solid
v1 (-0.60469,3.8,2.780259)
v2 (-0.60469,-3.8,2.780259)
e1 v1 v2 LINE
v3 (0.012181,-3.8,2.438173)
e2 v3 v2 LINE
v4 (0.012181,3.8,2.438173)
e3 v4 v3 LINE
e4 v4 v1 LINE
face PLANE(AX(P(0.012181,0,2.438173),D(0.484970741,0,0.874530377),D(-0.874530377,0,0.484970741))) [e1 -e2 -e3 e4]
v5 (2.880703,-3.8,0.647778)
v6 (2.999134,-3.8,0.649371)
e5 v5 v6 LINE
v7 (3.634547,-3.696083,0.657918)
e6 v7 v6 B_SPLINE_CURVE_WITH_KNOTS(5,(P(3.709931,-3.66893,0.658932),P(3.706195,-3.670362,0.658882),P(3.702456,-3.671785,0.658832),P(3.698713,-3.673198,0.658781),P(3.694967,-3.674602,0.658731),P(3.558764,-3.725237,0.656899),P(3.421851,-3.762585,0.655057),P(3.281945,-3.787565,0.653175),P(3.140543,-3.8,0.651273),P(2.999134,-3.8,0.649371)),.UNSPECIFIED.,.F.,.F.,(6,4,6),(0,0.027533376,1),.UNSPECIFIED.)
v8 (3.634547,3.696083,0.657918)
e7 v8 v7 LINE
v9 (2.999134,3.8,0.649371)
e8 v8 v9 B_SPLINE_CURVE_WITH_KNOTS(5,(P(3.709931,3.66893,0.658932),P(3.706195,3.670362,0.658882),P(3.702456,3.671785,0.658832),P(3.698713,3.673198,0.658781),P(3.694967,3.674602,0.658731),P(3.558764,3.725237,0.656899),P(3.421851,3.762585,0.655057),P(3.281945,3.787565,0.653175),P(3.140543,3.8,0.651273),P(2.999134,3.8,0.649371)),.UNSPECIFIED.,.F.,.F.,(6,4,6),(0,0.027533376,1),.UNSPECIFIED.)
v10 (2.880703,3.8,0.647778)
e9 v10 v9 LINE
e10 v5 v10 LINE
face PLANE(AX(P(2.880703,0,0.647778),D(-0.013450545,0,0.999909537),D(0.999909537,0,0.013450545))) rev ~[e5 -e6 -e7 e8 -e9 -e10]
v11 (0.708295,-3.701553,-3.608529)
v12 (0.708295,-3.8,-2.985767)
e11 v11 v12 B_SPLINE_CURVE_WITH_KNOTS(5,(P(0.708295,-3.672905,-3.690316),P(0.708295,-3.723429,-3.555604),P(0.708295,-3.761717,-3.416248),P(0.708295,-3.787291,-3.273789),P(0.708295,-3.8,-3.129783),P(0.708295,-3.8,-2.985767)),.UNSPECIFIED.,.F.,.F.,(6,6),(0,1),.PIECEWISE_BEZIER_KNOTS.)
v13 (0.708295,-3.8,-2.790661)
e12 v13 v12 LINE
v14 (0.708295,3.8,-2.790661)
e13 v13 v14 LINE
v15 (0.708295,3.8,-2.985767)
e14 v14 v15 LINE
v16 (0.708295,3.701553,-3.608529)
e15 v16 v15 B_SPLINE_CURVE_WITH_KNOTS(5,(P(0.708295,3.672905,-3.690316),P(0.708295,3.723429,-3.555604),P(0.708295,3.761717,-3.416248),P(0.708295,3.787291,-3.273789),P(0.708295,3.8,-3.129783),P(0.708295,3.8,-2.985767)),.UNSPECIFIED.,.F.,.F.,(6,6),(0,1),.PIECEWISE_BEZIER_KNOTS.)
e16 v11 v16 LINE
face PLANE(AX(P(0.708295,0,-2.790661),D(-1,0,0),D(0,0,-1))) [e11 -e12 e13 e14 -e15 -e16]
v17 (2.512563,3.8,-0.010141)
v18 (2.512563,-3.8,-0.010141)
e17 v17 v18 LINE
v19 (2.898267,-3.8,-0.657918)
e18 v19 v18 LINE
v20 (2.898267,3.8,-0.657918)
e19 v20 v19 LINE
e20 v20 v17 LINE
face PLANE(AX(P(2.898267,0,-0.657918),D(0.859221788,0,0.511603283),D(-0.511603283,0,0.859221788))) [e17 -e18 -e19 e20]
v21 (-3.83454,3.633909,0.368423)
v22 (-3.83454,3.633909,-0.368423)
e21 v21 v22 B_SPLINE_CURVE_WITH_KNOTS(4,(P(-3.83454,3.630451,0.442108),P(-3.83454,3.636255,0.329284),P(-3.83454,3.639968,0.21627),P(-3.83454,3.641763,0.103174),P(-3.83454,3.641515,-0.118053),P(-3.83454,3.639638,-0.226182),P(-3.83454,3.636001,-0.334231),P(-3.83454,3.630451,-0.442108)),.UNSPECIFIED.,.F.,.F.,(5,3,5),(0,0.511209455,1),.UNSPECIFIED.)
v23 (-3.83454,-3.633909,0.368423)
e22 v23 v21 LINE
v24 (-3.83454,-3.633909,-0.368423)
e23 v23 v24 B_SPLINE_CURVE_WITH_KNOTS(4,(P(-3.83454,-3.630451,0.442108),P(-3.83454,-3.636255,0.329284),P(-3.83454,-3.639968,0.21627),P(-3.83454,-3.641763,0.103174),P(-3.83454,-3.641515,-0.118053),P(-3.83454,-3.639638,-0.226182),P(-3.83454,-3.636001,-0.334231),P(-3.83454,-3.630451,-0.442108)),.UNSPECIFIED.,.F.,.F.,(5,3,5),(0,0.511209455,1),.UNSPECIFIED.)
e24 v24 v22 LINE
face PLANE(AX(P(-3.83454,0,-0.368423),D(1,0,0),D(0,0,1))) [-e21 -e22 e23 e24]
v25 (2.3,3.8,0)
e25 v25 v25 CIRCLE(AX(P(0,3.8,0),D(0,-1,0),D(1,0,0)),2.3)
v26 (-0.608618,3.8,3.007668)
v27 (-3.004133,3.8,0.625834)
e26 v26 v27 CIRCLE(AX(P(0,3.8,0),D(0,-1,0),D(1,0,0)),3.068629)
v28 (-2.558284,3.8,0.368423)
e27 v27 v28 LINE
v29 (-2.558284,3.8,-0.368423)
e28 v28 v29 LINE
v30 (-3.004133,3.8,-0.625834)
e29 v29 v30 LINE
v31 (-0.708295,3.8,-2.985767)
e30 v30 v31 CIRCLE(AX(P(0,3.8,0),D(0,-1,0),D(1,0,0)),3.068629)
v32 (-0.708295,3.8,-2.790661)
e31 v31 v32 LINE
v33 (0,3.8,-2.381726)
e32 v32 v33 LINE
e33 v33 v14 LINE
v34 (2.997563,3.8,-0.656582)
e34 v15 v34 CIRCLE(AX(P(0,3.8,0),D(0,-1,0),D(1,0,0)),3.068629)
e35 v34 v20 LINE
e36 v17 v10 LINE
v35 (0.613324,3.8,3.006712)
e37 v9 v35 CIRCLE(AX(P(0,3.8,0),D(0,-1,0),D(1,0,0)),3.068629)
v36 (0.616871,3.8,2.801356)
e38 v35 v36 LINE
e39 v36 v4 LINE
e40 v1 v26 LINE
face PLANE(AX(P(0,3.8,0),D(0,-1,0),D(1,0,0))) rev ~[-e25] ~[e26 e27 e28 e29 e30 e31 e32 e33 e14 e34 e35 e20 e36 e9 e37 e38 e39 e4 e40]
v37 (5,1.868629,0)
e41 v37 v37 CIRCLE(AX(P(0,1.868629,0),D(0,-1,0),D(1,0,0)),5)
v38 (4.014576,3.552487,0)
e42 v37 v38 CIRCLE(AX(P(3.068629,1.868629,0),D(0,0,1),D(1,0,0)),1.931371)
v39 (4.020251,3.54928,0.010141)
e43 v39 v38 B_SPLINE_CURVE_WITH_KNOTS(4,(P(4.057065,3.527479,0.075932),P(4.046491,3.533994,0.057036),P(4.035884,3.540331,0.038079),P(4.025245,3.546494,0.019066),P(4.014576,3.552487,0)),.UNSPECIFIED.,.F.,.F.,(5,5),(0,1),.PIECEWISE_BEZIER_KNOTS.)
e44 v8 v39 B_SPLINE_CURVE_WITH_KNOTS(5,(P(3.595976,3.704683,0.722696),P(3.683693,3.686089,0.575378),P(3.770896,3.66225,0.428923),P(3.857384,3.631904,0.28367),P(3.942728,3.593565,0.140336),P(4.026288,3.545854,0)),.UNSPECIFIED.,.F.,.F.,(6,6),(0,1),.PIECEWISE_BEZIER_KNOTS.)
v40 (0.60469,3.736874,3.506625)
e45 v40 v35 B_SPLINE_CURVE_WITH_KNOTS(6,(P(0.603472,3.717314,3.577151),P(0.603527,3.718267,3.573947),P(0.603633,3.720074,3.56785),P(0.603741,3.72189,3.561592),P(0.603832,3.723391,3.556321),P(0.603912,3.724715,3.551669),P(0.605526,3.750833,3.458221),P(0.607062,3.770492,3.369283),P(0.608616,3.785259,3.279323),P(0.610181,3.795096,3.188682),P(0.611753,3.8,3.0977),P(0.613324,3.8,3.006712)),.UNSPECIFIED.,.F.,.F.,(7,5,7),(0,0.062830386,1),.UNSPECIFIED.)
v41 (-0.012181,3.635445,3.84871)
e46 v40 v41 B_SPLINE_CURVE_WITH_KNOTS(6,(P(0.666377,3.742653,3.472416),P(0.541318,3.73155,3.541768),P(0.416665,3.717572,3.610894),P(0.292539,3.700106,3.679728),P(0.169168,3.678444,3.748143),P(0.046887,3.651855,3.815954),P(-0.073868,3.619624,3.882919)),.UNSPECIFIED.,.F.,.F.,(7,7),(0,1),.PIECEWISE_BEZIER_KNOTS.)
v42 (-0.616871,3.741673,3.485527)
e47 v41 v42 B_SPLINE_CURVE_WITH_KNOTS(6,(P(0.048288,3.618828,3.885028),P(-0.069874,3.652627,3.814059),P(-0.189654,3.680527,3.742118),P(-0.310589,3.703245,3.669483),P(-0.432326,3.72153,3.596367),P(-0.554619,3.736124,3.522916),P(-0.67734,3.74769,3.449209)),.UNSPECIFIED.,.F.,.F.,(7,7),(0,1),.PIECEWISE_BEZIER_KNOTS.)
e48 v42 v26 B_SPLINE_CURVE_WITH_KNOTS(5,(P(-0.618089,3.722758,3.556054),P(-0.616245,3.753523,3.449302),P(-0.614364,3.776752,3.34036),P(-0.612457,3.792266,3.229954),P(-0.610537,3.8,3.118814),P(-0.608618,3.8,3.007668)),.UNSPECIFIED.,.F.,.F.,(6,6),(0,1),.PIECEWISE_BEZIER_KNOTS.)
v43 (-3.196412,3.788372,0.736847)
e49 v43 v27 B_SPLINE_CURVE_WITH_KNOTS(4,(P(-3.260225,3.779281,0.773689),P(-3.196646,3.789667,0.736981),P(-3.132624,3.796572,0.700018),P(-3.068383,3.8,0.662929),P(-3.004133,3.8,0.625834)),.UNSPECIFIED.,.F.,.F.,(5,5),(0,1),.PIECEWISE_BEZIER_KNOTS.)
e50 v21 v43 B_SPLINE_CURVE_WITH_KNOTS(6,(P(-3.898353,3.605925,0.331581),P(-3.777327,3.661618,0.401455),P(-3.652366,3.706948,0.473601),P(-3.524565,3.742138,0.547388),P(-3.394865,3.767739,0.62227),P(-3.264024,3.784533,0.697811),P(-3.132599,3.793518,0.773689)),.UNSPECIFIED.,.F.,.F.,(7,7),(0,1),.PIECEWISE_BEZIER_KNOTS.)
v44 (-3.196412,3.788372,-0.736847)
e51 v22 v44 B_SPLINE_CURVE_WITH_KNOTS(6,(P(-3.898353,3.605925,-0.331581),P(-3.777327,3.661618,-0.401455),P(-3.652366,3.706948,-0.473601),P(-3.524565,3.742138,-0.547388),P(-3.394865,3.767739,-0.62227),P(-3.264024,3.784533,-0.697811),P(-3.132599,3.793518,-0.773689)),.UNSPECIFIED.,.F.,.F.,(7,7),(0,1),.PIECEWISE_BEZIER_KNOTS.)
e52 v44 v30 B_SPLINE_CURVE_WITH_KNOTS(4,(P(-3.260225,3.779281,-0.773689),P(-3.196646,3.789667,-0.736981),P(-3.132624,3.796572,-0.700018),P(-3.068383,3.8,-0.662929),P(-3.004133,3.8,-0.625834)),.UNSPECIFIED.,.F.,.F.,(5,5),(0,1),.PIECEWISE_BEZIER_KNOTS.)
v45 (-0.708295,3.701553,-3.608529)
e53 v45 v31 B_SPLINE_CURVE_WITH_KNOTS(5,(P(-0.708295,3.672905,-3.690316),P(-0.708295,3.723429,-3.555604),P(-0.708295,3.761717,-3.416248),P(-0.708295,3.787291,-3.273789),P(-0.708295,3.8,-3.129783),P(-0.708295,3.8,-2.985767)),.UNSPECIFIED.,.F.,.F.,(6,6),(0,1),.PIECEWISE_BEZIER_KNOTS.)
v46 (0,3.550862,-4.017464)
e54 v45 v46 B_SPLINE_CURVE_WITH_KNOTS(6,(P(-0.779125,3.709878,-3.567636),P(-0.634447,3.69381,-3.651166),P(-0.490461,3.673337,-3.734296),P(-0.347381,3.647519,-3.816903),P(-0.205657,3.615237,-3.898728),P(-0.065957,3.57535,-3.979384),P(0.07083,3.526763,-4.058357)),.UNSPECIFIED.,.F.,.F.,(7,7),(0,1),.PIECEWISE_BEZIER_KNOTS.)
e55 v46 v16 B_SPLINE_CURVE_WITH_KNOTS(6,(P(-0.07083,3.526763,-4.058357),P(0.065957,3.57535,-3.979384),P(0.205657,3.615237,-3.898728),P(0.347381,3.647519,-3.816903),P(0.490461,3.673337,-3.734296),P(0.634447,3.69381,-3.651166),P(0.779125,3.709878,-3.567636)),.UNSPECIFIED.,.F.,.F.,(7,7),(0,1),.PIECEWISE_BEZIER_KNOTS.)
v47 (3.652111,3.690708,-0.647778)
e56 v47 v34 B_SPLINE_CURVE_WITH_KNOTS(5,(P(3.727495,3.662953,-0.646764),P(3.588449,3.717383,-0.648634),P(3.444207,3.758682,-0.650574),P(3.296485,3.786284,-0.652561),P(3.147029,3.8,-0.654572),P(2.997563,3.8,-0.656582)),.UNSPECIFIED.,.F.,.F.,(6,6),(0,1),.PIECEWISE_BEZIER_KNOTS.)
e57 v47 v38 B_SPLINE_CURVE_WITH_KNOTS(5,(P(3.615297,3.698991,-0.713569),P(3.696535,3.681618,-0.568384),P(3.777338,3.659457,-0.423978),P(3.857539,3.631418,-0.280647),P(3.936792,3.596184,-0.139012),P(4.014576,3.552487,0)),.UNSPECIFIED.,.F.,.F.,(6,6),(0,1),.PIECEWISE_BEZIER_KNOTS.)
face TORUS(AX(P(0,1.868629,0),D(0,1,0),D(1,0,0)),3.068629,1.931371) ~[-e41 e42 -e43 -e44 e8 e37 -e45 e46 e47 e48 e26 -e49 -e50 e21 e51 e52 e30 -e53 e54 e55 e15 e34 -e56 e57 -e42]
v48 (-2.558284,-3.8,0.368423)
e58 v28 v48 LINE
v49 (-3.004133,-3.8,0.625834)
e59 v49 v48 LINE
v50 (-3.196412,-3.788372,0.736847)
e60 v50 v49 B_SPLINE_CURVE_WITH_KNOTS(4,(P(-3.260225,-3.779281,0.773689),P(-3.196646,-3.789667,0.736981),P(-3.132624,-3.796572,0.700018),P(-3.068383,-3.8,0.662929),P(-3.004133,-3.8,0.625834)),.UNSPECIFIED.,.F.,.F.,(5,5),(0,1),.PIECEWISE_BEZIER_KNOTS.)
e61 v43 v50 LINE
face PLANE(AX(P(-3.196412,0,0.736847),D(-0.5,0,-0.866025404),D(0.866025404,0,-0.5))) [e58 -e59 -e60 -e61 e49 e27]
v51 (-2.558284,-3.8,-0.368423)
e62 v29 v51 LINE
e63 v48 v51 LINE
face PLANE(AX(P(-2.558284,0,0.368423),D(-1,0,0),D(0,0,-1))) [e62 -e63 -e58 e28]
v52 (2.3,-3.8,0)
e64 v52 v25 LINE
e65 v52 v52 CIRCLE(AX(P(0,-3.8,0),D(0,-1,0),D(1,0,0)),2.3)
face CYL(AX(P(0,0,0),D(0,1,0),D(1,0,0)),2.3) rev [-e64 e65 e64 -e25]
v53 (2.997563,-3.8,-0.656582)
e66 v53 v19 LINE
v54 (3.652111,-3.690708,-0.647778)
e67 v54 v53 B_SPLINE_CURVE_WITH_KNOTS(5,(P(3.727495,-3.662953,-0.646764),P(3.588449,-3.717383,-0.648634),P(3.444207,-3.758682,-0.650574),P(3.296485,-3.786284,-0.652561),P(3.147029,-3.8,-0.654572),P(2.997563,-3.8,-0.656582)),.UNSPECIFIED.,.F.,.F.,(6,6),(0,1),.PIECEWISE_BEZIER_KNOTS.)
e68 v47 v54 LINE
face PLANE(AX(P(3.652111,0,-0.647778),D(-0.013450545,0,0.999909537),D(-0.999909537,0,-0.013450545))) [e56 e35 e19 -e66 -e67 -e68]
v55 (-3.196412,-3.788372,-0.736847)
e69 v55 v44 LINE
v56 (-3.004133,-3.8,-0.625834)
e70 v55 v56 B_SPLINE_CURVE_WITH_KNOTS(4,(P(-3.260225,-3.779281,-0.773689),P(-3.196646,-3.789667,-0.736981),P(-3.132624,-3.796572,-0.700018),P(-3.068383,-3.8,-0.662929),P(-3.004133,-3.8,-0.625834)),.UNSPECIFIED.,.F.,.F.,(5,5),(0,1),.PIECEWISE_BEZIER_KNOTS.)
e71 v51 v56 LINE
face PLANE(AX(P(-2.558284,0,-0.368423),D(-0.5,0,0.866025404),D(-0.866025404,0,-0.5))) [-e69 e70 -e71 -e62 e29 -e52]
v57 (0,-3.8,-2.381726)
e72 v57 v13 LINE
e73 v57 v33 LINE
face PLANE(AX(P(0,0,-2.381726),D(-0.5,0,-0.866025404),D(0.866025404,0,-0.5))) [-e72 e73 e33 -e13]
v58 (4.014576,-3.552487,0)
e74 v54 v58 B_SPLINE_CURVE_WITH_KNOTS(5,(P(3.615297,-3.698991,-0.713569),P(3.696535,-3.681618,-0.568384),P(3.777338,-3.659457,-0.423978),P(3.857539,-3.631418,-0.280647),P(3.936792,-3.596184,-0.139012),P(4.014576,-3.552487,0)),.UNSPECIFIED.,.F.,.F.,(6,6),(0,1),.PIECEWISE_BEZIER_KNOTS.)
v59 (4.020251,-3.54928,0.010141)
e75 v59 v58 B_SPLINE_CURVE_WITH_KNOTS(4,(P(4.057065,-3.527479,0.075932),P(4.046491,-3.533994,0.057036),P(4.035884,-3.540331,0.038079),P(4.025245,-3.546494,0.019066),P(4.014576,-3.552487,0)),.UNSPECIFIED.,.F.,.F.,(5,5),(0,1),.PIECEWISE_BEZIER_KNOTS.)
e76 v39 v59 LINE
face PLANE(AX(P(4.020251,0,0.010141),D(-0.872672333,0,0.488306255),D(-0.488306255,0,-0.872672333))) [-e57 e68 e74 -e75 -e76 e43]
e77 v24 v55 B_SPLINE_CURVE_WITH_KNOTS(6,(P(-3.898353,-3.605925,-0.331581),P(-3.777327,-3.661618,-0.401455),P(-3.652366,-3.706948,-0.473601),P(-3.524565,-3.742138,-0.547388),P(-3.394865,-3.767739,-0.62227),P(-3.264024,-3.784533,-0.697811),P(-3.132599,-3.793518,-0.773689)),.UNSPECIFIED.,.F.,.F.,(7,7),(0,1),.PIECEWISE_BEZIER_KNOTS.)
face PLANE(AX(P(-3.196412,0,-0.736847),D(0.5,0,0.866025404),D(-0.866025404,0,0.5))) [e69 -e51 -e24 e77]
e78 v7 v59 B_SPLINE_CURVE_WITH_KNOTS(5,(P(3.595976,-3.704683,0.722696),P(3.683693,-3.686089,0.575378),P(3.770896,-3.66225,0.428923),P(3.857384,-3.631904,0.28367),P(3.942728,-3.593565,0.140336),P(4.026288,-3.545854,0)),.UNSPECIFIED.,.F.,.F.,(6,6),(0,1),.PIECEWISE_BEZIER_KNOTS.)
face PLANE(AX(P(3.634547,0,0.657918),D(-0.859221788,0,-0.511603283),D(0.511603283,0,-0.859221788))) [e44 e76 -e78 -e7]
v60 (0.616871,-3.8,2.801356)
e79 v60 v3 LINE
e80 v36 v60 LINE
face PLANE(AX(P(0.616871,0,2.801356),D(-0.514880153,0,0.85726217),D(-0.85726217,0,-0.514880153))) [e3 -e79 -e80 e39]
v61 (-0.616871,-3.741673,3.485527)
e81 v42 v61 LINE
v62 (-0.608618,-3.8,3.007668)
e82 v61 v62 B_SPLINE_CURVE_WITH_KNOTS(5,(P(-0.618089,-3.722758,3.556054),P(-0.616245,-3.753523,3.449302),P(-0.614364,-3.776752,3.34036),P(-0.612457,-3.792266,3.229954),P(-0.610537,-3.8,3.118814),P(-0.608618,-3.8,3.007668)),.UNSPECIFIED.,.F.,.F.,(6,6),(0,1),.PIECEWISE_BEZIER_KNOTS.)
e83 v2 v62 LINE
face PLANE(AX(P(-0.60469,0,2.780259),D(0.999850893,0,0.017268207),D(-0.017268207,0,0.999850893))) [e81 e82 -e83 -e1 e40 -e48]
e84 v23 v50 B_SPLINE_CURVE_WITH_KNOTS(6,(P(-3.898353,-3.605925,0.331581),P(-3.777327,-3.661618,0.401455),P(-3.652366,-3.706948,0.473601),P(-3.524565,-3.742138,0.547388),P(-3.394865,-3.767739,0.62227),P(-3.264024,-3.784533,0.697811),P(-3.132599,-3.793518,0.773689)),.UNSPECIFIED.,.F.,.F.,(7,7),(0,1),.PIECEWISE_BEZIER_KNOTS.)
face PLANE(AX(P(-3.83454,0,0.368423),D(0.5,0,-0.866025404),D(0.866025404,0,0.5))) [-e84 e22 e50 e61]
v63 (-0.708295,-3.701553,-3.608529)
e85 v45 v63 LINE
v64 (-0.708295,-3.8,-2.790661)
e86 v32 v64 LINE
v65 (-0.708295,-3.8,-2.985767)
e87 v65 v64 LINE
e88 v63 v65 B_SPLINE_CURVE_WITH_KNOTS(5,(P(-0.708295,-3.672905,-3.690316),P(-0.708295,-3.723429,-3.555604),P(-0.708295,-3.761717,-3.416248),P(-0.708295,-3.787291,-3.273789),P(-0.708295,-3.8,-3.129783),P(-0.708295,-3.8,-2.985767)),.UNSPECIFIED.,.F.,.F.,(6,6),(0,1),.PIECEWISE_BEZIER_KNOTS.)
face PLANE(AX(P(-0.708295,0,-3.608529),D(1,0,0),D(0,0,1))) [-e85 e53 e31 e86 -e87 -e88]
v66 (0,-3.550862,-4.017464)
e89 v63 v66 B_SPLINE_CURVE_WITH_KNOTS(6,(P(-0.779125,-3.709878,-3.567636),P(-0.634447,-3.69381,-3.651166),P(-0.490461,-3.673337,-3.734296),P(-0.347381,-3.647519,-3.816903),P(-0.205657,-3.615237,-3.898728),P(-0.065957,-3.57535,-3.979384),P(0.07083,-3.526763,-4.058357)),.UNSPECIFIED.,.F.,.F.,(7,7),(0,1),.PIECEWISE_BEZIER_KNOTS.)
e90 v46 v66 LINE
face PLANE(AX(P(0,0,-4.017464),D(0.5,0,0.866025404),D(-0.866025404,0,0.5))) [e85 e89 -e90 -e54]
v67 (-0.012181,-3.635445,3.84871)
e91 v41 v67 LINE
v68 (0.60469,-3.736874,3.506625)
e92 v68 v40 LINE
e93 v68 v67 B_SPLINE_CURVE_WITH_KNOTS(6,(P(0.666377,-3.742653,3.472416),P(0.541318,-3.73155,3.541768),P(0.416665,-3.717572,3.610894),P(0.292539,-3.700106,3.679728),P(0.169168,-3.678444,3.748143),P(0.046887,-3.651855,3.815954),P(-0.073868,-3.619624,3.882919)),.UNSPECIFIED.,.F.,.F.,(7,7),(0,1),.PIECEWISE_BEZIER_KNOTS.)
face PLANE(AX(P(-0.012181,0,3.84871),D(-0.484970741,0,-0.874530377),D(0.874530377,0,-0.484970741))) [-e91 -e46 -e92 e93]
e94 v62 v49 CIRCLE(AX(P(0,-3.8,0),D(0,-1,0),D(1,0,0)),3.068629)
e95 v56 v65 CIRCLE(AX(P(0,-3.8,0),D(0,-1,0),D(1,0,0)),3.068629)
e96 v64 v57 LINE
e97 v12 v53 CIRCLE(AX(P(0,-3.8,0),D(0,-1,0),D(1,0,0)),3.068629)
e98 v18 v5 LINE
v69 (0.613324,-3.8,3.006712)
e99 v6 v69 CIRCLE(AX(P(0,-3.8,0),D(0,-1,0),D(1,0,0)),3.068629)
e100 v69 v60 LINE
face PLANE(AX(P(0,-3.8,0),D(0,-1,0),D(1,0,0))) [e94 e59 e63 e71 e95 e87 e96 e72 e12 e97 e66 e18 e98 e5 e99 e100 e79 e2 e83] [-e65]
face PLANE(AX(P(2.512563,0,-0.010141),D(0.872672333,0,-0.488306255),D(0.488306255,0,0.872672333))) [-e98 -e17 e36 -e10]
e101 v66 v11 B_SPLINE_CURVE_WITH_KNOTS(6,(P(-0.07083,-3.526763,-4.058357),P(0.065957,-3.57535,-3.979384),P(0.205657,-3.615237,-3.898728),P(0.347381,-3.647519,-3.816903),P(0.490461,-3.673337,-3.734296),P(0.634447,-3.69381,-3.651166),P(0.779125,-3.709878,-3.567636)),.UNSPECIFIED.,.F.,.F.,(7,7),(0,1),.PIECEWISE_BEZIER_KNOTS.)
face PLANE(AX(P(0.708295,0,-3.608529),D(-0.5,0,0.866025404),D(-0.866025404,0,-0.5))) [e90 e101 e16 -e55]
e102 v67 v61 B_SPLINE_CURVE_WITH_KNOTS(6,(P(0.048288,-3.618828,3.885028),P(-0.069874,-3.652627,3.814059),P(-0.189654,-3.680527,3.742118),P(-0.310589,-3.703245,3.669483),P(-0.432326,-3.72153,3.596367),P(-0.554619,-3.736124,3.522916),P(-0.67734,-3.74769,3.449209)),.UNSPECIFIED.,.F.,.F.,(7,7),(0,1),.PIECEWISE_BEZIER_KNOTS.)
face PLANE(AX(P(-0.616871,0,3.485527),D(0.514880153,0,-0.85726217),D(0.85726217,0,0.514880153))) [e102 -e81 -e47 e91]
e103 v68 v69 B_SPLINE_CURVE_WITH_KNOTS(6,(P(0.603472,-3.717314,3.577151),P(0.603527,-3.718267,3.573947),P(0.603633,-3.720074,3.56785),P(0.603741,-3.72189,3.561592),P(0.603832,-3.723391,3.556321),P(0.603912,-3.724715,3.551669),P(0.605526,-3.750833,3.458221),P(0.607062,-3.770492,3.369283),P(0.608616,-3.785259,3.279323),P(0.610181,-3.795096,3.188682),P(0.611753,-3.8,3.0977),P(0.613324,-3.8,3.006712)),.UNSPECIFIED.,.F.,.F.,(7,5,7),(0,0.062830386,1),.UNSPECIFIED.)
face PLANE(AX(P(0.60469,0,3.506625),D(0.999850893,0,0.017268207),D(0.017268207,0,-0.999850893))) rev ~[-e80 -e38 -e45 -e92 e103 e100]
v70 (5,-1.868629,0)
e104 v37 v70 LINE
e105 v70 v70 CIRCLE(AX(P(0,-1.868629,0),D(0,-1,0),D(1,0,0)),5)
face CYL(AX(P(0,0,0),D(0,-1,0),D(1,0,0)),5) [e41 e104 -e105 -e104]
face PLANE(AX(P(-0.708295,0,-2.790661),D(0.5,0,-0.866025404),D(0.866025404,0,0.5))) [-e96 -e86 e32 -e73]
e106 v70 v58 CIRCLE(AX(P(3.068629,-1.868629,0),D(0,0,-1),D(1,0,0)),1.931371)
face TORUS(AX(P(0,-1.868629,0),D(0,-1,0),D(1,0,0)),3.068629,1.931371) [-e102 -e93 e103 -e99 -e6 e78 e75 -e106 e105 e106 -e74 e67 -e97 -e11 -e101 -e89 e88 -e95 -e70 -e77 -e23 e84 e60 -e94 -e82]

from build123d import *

# Parameters (mm, degrees)
F0_R     = 5
F0_R_2   = 2.3
F1_DEPTH = 3.8


# Not quite as in the source:
# - a fillet or chamfer that OpenCascade refuses, or shapes differently, is made with other operations: its cross-section is extruded or revolved along the edge and cut away or added


with BuildPart() as f1:
    # F0 (on Front) → F1 (new body, symmetric)
    with BuildSketch(Plane.XZ):
        Circle(F0_R)
        Polygon((0, -4.0174636819), (-0.7082950324, -3.6085293543), (-0.7082950324, -2.7906606991), (0, -2.3817263714), (0.7082950324, -2.7906606991), (0.7082950324, -3.6085293543), align=None, mode=Mode.SUBTRACT)
        Polygon((-3.1964122335, 0.7368465077), (-2.5582844391, 0.3684232539), (-2.5582844391, -0.3684232539), (-3.1964122335, -0.7368465077), (-3.8345400279, -0.3684232539), (-3.8345400279, 0.3684232539), align=None, mode=Mode.SUBTRACT)
        Circle(F0_R_2, mode=Mode.SUBTRACT)
        Polygon((2.8982667587, -0.6579181574), (2.512562897, -0.0101405277), (2.8807028495, 0.6477776297), (3.6345466637, 0.6579181574), (4.0202505254, 0.0101405277), (3.6521105729, -0.6477776297), align=None, mode=Mode.SUBTRACT)
        Polygon((0.6046901305, 3.5066245139), (0.6168706685, 2.8013560578), (0.012180538, 2.4381731744), (-0.6046901305, 2.7802587472), (-0.6168706685, 3.4855272032), (-0.012180538, 3.8487100866), align=None, mode=Mode.SUBTRACT)
    extrude(amount=F1_DEPTH, both=True)

    # F2: fillet of radius 1.9313708499 on 3 edges, made by hand

    # F2_s1 → F2_t2 (revolve, cut)
    with BuildSketch(Plane.XY):
        with BuildLine():
            ThreePointArc((5, 1.8686291501), (4.4343145751, 3.2343145751), (3.0686291501, 3.8))
            Line((3.0686291501, 3.8), (5, 3.8))
            Line((5, 3.8), (5, 1.8686291501))
        make_face()
    revolve(axis=Axis((0, 3.8, 0), (0, -1, 0)), mode=Mode.SUBTRACT)

    # F2_s3 → F2_t4 (revolve, cut)
    with BuildSketch(Plane.XY):
        with BuildLine():
            ThreePointArc((5, -1.8686291501), (4.4343145751, -3.2343145751), (3.0686291501, -3.8))
            Line((3.0686291501, -3.8), (5, -3.8))
            Line((5, -3.8), (5, -1.8686291501))
        make_face()
    revolve(axis=Axis((0, -3.8, 0), (0, -1, 0)), mode=Mode.SUBTRACT)


solid = f1.part
